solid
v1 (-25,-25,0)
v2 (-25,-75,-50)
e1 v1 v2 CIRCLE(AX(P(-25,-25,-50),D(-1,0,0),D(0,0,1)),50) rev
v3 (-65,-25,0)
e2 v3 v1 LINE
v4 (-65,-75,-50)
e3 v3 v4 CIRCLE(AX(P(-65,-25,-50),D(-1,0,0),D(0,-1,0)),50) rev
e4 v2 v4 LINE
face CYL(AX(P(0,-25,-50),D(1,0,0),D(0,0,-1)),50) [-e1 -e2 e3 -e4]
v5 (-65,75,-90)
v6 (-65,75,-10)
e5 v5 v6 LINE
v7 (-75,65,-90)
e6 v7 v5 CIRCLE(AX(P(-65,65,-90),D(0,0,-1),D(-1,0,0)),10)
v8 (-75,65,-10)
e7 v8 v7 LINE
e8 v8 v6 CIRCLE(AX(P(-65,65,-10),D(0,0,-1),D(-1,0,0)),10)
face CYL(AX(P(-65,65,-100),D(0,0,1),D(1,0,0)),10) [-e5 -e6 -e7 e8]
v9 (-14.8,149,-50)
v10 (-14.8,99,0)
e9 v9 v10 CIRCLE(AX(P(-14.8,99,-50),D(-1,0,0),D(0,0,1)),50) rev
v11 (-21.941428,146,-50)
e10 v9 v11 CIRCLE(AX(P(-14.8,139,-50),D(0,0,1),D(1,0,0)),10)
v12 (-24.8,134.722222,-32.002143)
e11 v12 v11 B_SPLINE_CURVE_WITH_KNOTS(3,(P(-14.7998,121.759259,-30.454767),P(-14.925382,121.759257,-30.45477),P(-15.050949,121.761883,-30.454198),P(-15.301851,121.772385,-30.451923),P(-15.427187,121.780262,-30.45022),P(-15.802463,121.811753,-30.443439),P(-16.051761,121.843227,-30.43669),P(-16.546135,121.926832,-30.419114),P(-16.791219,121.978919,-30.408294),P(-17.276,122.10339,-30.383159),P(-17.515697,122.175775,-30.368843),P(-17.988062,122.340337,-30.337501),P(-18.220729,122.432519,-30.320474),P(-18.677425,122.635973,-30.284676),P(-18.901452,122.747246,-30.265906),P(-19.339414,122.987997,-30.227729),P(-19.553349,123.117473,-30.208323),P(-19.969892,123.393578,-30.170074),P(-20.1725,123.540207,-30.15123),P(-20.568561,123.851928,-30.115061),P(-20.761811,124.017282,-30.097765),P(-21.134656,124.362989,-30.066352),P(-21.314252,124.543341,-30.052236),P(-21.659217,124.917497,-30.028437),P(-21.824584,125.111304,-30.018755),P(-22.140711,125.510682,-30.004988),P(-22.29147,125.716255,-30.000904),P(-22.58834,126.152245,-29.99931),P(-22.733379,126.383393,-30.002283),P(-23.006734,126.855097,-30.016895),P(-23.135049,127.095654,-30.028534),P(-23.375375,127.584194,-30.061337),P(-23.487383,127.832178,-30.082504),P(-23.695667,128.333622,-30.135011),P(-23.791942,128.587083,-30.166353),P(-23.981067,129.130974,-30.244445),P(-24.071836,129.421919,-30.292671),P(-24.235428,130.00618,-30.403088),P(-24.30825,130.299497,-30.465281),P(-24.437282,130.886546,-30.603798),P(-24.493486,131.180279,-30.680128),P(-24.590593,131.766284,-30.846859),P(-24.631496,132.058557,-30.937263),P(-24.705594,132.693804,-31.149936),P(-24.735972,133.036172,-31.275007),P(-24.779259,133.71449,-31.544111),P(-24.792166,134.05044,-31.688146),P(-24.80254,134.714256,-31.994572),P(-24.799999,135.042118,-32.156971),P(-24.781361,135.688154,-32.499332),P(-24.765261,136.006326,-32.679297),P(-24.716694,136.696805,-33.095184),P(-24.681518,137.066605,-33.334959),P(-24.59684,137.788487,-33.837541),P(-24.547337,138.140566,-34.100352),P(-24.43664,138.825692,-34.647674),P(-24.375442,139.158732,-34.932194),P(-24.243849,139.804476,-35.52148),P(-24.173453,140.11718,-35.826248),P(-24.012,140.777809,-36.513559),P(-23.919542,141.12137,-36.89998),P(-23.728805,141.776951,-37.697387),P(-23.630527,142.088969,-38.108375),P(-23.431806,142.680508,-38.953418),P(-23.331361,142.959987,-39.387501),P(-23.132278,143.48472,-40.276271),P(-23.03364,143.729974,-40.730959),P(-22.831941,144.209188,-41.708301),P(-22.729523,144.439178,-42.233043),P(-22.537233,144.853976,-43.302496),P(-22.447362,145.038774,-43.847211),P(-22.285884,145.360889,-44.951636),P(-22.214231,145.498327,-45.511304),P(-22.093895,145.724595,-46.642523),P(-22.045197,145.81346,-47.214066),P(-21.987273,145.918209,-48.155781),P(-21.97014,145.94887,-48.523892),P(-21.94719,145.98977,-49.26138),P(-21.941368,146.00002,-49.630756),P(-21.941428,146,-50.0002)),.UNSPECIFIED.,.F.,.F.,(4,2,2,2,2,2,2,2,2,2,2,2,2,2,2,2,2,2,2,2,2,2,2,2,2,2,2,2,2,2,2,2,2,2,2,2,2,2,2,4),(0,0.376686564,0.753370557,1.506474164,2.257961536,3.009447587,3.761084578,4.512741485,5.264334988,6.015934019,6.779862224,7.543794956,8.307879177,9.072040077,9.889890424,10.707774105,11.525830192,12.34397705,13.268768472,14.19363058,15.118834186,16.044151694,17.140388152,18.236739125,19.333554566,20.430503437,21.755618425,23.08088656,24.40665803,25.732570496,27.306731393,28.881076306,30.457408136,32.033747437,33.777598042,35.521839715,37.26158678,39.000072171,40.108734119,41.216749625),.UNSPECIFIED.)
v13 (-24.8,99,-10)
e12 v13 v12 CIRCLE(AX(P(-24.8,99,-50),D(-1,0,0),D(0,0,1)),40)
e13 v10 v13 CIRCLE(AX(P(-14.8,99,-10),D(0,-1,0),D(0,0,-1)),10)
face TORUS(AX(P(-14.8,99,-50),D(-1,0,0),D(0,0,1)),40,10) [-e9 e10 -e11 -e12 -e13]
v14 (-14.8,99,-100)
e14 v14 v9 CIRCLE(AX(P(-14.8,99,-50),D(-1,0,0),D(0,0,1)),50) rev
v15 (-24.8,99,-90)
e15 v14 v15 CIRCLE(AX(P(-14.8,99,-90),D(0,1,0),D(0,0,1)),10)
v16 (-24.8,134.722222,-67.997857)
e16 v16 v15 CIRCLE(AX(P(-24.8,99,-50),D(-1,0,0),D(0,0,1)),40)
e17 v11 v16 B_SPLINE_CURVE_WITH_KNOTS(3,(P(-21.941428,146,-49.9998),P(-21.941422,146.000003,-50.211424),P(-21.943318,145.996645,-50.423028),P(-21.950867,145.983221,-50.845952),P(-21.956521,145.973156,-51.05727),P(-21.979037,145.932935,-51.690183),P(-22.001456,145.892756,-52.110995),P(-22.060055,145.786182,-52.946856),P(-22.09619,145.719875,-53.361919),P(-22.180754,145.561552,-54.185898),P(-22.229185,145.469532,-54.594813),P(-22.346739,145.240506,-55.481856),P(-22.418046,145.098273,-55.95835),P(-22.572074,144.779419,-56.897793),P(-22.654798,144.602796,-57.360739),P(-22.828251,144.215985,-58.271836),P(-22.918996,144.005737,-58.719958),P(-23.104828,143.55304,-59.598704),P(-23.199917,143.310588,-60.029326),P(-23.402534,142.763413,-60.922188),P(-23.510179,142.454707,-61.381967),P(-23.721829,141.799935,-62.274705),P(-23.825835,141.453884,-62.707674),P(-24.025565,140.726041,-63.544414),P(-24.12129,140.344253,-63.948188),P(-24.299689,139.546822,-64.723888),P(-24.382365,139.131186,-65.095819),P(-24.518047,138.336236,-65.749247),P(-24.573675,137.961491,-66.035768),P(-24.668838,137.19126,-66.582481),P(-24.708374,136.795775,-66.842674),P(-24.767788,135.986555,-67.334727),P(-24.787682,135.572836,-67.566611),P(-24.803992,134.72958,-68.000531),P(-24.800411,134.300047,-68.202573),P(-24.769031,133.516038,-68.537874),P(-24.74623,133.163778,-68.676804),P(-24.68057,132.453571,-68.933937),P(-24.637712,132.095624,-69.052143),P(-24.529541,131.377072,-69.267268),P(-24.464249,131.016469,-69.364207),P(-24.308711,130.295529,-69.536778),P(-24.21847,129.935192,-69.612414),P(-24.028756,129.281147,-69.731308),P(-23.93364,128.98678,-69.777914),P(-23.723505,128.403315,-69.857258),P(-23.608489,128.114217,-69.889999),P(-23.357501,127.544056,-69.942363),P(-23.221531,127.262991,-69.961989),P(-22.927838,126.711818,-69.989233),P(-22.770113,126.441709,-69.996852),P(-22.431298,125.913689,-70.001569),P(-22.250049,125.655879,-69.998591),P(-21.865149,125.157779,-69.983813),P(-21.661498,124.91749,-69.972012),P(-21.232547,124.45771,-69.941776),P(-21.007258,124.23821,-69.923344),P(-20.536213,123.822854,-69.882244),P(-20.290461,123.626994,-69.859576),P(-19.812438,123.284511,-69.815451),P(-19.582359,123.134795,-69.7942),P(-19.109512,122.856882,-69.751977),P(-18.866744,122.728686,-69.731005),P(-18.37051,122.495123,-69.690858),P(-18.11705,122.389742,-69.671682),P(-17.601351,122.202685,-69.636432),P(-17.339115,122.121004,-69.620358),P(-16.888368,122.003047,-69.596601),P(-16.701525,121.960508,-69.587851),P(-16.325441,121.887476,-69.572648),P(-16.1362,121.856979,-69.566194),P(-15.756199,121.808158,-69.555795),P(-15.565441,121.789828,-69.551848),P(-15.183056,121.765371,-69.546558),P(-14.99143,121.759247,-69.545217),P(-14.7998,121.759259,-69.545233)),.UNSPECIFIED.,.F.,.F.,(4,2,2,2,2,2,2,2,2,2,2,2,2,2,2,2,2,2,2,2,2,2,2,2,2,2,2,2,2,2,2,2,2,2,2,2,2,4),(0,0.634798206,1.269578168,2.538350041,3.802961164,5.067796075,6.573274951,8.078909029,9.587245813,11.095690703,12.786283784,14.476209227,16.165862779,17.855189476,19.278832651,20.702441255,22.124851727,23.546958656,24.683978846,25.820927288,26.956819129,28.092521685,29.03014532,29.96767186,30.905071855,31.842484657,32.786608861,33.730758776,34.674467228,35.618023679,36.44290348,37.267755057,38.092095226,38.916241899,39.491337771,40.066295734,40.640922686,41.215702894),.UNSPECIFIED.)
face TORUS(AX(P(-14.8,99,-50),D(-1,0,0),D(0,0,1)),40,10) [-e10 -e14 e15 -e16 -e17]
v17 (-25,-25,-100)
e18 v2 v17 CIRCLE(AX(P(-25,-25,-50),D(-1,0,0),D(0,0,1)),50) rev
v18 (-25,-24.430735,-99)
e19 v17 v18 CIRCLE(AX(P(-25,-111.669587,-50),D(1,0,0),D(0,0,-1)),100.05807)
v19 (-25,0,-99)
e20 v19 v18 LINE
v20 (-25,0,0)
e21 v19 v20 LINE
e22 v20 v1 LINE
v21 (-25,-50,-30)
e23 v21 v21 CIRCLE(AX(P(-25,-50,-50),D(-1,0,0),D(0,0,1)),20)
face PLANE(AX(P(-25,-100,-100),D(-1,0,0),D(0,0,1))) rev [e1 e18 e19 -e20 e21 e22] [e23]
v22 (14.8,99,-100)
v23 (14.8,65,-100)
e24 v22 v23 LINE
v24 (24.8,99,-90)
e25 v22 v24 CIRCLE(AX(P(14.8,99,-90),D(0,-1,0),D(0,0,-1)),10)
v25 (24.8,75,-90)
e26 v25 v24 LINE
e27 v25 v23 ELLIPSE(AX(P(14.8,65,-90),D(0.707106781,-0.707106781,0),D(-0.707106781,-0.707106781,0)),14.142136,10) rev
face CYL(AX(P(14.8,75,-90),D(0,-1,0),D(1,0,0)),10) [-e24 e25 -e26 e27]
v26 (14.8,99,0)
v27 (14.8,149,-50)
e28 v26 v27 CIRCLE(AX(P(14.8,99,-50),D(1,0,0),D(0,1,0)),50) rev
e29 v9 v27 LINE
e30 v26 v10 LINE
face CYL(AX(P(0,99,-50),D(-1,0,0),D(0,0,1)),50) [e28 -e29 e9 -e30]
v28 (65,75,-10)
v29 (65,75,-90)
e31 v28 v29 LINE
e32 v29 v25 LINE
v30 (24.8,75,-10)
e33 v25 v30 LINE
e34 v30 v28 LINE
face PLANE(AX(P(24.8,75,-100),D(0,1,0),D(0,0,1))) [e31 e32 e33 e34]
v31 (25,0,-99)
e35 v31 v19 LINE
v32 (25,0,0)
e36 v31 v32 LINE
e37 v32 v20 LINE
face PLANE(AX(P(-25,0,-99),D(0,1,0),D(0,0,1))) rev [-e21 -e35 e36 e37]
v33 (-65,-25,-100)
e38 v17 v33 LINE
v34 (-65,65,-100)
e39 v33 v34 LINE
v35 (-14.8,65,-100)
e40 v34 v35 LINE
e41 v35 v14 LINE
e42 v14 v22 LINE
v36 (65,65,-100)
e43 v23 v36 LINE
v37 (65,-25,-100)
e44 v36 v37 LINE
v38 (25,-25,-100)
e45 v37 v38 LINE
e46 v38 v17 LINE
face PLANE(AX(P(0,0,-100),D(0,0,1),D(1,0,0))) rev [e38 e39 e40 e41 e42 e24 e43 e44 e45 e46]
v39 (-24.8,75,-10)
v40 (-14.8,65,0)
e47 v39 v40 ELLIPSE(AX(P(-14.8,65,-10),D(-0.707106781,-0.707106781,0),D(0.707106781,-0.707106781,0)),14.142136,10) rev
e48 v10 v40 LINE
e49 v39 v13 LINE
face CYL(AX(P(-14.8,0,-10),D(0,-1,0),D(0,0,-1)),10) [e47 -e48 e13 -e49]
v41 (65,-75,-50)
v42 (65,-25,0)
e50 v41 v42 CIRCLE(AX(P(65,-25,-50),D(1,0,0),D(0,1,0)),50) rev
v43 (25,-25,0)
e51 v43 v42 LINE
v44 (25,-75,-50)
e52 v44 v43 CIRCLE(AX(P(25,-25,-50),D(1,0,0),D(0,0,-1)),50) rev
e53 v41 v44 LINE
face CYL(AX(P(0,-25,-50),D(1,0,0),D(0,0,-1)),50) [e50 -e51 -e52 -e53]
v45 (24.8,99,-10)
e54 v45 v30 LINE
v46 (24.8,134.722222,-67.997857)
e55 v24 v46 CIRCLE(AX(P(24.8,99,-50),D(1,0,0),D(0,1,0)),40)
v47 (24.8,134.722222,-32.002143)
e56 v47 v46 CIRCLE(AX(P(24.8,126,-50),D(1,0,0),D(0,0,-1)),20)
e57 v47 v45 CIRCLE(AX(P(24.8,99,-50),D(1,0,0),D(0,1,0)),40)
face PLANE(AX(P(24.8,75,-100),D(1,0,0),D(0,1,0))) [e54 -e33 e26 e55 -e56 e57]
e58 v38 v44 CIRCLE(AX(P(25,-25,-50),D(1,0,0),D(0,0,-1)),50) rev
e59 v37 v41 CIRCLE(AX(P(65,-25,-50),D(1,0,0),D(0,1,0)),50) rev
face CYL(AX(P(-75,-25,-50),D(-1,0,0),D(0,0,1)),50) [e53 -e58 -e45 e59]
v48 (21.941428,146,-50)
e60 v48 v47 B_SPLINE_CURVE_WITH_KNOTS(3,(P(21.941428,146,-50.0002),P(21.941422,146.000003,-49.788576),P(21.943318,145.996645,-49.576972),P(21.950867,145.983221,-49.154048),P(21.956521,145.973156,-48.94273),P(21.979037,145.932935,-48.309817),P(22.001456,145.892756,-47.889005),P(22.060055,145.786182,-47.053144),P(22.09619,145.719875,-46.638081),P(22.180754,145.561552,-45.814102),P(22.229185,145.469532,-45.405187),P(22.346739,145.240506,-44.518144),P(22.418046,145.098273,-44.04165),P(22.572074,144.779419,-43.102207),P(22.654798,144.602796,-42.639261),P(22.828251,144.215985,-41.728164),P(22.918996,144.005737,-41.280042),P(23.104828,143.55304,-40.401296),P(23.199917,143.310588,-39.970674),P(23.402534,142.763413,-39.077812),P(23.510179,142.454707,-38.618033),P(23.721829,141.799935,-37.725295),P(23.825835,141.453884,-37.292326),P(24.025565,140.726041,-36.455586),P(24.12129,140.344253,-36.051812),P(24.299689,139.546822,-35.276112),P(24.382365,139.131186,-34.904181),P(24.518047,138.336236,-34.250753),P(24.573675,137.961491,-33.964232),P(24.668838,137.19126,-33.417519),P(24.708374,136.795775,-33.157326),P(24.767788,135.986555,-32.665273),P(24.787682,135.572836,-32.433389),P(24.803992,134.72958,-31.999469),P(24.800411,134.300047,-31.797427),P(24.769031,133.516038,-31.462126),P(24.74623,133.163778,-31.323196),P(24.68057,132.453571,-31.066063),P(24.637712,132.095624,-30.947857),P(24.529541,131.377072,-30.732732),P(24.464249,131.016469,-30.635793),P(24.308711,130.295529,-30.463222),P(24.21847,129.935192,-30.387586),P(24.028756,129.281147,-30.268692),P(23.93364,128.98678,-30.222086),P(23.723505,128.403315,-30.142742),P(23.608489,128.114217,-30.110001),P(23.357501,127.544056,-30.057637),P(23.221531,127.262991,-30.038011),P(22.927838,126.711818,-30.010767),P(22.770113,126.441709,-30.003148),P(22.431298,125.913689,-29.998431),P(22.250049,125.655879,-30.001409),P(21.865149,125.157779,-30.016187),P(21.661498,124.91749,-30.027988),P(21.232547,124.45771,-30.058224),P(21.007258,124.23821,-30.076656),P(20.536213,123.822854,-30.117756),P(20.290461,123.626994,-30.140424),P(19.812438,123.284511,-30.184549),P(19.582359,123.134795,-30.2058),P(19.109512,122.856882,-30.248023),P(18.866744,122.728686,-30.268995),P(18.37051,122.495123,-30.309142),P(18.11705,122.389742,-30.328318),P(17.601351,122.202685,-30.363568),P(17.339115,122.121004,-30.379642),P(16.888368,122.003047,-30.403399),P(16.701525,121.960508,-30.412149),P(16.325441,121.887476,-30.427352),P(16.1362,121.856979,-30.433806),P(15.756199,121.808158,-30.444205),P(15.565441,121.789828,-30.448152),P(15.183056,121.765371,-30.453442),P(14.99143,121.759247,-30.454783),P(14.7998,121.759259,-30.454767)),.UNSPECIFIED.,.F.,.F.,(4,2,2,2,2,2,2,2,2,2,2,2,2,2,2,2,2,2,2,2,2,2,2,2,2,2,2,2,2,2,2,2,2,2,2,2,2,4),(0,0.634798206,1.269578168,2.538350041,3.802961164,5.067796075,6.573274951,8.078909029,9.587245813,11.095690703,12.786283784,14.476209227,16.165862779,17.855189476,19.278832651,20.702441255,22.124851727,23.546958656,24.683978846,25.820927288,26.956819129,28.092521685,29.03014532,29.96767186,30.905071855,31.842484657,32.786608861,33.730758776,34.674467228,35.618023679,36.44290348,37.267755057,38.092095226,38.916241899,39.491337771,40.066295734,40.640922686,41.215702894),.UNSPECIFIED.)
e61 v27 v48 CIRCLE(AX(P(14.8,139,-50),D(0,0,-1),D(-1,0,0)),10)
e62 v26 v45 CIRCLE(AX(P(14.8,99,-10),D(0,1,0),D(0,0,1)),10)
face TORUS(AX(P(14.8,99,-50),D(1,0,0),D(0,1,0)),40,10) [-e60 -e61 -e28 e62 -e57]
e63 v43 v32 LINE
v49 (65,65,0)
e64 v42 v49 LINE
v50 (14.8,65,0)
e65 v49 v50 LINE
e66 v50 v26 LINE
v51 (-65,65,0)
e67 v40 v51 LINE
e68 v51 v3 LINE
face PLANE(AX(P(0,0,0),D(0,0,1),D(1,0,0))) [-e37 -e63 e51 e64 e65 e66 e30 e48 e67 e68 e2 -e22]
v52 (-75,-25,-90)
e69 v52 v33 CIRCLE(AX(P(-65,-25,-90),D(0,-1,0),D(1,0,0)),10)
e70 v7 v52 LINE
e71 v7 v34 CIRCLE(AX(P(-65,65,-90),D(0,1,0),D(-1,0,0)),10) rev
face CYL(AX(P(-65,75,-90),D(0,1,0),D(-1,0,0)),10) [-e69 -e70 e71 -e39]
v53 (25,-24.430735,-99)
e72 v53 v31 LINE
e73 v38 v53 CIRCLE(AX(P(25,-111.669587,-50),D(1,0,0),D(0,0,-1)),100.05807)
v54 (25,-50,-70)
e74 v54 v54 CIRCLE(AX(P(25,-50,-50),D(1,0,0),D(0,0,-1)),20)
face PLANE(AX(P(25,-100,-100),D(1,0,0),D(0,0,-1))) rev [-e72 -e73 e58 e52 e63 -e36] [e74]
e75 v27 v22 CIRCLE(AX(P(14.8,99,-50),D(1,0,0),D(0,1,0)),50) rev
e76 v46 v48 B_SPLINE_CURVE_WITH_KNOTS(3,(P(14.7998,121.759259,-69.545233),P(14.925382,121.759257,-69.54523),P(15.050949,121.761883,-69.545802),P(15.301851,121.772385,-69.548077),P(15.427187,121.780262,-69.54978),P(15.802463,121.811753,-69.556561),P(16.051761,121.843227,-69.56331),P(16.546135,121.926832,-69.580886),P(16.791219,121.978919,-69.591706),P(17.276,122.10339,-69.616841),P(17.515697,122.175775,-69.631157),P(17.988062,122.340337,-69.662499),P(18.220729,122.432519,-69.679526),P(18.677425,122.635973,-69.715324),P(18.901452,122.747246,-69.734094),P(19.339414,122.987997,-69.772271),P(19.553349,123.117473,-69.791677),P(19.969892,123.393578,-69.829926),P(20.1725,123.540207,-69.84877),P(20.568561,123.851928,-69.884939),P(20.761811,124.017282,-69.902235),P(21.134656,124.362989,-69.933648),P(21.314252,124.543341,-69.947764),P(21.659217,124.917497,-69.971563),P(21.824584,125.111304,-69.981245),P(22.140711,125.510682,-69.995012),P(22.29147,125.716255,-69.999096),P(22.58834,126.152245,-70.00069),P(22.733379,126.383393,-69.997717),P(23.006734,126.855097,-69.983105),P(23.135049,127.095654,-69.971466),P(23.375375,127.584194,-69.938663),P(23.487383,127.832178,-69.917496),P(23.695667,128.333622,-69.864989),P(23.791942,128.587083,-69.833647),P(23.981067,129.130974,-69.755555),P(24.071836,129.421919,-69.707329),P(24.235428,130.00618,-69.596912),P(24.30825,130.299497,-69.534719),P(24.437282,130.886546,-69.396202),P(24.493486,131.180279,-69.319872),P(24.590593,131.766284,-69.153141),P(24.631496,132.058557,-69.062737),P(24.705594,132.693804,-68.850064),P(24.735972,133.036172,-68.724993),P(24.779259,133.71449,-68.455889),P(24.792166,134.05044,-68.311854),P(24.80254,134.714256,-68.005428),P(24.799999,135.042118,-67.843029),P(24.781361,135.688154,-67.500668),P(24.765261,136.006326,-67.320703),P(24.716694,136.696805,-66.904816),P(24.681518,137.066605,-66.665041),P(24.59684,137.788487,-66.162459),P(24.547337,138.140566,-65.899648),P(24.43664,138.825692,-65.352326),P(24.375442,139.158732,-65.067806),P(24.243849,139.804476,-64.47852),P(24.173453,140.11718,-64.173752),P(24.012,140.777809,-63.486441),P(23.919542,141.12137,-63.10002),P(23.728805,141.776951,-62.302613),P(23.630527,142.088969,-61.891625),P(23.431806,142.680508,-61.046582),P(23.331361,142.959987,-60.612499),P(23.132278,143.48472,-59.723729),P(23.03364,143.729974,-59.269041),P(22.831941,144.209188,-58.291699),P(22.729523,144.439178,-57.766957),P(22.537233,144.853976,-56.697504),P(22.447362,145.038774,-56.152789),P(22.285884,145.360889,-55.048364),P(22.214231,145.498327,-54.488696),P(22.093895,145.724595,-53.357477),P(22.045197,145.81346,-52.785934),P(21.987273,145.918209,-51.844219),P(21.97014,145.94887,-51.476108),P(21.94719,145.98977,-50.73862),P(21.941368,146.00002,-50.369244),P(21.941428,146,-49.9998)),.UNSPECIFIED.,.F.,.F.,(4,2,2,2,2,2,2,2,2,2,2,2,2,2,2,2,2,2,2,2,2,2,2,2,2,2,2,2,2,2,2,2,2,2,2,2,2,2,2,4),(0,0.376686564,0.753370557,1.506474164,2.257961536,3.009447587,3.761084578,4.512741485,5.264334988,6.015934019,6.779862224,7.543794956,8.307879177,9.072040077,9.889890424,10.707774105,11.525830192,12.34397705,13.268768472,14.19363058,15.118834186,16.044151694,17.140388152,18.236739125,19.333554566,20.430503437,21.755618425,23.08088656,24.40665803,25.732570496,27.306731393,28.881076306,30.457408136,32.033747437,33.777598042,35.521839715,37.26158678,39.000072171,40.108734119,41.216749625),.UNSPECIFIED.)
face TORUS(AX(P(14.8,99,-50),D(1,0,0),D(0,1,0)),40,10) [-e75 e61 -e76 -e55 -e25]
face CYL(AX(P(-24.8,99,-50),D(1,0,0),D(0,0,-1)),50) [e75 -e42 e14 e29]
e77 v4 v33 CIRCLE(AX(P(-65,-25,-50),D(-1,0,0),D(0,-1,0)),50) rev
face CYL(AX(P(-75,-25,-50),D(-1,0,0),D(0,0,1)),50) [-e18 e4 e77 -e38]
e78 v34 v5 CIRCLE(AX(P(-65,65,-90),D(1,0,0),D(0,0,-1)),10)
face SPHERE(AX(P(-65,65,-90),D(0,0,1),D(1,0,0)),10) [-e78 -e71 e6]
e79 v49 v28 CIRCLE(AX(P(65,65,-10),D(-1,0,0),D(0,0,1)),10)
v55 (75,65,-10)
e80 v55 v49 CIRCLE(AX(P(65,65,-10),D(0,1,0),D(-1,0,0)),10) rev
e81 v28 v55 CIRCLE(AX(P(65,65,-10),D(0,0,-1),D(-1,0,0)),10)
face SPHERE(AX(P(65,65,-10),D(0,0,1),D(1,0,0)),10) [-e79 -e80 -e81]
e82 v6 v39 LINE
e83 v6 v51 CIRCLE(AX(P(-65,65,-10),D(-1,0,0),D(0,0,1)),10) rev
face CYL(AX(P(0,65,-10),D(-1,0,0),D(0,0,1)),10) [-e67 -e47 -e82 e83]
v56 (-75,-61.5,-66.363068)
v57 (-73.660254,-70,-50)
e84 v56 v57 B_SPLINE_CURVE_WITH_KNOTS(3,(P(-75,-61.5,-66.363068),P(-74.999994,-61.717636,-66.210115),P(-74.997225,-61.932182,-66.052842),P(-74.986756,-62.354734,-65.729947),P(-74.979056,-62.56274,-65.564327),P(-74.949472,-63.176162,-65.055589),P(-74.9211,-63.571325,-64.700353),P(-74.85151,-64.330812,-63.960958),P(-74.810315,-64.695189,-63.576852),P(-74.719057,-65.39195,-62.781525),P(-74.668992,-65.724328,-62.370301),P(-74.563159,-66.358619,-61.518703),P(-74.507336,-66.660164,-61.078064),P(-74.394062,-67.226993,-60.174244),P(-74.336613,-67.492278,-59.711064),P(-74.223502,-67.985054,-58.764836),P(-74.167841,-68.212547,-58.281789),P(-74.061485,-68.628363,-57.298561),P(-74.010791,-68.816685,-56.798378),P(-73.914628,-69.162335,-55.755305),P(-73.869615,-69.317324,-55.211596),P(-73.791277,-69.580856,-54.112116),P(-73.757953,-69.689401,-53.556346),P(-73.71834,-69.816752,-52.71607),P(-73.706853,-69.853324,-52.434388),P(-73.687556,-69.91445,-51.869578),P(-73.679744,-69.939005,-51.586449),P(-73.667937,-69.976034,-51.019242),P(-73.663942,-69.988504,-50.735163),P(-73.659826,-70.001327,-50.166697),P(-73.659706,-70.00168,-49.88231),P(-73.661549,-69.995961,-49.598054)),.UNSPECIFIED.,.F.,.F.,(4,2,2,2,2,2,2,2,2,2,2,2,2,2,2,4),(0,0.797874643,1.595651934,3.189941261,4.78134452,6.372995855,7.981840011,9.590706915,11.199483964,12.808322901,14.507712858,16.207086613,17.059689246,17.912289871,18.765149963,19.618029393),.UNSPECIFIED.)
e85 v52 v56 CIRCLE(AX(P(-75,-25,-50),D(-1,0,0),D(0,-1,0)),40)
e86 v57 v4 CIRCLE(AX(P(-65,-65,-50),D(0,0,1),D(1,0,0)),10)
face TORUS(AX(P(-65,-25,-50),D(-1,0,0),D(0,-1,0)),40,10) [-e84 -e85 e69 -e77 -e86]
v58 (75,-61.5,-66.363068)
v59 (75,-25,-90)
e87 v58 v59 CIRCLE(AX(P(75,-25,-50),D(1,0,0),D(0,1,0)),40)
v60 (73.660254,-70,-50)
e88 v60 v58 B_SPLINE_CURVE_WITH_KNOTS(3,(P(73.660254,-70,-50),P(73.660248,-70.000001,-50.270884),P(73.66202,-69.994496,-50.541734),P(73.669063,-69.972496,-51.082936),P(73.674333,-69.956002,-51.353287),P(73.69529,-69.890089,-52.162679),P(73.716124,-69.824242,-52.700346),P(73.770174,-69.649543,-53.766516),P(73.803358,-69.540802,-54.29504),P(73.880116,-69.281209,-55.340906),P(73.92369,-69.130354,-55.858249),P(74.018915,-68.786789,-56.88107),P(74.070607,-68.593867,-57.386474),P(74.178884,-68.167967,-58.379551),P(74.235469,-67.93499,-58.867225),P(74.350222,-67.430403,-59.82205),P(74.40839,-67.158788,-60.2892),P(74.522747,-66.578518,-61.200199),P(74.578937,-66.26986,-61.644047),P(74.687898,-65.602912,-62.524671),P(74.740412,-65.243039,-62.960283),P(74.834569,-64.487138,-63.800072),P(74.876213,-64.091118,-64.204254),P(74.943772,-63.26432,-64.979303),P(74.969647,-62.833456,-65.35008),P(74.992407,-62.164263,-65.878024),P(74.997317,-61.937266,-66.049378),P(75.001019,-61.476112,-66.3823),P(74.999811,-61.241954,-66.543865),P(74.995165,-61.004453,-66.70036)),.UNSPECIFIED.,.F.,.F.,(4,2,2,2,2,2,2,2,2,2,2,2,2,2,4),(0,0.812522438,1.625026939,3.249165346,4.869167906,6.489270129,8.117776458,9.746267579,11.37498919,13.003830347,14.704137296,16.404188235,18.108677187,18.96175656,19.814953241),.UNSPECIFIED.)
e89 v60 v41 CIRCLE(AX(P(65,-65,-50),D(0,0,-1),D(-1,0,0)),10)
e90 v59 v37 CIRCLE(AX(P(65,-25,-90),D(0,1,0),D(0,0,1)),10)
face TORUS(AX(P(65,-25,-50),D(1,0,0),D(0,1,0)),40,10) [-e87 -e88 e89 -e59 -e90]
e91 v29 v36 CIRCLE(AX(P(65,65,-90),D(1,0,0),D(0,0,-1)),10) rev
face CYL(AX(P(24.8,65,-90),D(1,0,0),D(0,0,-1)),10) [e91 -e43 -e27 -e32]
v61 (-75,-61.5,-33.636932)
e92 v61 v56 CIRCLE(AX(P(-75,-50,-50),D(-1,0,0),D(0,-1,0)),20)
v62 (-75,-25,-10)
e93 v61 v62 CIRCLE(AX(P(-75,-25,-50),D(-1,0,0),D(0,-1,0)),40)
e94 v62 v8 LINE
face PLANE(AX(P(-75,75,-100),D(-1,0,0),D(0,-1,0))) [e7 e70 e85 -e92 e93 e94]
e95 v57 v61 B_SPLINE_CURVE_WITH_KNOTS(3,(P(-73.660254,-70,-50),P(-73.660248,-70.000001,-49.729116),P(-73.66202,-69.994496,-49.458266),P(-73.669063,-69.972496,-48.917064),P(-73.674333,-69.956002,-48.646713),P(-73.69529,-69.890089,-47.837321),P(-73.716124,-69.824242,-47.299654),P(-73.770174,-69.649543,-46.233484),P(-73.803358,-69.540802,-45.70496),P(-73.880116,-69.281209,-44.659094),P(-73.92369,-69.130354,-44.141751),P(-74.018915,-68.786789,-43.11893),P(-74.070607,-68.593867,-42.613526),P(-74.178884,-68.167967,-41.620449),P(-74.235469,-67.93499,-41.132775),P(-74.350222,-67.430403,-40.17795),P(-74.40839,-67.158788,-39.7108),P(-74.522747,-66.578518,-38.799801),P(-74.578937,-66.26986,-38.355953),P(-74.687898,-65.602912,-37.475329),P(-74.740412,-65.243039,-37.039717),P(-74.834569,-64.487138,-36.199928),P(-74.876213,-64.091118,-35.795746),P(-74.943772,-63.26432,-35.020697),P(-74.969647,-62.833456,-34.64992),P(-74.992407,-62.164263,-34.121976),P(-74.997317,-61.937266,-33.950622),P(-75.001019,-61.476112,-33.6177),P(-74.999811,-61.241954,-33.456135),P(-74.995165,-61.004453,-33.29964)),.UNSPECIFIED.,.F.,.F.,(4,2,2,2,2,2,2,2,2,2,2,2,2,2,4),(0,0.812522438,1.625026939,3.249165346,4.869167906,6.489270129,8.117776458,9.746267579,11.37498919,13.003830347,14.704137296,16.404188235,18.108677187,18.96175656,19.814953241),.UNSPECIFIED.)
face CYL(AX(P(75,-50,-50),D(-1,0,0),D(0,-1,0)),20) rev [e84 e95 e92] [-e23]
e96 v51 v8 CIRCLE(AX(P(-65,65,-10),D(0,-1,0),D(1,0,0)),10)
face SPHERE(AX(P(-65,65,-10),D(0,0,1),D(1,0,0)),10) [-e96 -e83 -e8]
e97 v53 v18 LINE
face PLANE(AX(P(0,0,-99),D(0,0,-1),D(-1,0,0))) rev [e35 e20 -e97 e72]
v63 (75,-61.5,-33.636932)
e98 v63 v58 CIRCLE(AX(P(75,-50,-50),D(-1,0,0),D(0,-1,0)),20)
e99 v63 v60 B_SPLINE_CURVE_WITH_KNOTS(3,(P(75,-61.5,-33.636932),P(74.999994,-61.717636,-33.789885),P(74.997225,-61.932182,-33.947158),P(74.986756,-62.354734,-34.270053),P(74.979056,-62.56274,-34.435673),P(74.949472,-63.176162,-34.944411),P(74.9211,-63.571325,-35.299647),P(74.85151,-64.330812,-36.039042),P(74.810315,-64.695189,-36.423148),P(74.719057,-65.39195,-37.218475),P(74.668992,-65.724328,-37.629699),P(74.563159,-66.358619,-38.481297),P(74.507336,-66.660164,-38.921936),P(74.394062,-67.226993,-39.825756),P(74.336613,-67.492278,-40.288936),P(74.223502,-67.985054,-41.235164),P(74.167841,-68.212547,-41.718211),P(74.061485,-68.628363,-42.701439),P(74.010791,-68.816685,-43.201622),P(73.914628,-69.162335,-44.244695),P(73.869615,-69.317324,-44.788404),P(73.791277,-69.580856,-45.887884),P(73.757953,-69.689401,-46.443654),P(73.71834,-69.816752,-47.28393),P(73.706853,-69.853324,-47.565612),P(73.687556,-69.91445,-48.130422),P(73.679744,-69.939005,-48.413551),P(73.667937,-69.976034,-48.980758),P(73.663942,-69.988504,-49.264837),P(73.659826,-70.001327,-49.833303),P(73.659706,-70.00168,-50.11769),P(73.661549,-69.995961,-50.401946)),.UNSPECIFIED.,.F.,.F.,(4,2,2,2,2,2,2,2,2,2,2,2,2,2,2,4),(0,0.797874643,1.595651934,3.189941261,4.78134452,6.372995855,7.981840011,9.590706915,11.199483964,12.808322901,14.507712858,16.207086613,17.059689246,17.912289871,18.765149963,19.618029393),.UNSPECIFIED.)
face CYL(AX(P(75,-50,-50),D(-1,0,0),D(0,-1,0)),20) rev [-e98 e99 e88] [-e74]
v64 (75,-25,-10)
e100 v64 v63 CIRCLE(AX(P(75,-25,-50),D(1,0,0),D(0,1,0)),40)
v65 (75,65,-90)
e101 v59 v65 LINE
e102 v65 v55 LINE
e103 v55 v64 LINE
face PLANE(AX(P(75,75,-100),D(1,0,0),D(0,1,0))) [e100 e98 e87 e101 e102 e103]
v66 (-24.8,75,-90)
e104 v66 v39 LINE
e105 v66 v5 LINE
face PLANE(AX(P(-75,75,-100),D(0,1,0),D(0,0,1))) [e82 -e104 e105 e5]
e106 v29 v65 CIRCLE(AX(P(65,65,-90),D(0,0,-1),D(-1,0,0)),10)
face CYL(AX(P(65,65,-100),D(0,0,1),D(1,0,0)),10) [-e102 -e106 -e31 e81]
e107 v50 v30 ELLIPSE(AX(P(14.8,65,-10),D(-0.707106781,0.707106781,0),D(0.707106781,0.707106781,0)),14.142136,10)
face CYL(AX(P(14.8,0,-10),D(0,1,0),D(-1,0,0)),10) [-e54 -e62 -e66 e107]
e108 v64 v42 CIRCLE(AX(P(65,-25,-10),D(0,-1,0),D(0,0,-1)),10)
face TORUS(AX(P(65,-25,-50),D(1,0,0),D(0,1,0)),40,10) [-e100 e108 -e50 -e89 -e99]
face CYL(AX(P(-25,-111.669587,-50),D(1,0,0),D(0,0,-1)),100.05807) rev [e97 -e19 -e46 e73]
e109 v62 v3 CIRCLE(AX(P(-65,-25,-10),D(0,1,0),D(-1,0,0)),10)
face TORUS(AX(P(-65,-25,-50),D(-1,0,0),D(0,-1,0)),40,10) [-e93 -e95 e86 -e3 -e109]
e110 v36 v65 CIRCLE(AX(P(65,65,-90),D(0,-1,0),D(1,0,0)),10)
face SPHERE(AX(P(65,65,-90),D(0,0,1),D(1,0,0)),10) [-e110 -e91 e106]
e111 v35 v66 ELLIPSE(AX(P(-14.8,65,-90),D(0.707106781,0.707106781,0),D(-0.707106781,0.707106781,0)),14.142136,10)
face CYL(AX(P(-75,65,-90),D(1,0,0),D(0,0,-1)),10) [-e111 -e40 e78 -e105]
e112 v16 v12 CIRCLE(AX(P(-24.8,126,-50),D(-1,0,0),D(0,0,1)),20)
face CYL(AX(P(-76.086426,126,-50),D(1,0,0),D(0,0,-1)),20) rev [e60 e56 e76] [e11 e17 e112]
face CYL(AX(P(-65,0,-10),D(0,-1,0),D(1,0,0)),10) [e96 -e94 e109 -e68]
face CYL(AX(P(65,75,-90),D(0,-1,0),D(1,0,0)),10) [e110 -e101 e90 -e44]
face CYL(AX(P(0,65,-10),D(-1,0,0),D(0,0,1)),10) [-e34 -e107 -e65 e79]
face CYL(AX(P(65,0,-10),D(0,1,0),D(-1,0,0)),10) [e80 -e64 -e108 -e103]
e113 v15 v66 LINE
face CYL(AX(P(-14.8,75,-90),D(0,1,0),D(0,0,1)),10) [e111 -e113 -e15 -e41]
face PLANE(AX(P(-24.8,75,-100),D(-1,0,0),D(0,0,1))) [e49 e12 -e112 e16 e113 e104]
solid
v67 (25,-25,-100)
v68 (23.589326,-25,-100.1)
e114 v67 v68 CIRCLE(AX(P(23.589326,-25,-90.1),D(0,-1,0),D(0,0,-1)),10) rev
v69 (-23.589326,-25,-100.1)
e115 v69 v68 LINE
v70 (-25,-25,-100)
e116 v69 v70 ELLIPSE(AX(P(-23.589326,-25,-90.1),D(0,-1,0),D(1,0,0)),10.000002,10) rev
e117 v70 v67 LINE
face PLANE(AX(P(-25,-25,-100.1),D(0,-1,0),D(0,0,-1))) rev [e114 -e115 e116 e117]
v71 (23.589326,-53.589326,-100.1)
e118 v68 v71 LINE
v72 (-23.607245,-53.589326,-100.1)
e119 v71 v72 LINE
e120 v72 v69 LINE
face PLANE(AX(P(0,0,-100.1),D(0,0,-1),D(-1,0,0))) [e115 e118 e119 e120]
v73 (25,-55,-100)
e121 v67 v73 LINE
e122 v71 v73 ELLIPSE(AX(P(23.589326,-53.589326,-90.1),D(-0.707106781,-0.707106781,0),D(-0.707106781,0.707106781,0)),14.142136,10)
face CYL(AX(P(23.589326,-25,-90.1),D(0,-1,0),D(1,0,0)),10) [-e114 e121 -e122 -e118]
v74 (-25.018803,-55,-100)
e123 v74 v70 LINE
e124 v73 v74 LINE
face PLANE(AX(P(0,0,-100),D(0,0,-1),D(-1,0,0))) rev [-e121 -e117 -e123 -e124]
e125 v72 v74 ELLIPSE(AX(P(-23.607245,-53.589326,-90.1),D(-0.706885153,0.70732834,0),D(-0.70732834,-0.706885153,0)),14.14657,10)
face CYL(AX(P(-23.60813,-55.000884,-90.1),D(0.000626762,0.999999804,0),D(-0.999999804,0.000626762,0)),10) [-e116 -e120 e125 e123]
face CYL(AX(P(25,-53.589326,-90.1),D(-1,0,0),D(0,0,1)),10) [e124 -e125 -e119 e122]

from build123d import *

# Parameters (mm, degrees)
BOSS_EXTRUDE1_DEPTH    = 100
SKETCH2_W              = 50
SKETCH2_H              = 50
CUT_EXTRUDE1_DEPTH     = 195.489074243
FILLET1_R              = 50
CUT_EXTRUDE2_DEPTH     = 25
SKETCH7_R              = 20
CUT_EXTRUDE3_DEPTH     = 234.882449106
FILLET2_R              = 50
CUT_EXTRUDE6_START     = -75
CUT_EXTRUDE6_OUTLINE_W = 50
CUT_EXTRUDE6_OUTLINE_H = 6.698729811
CUT_EXTRUDE6_DEPTH     = 50
CUT_EXTRUDE7_DEPTH     = 25
FILLET3_R              = 10
SKETCH11_W             = 50
SKETCH11_H             = 25
CUT_EXTRUDE8_DEPTH     = 99
BOSS_EXTRUDE7_DEPTH    = 0.1
FILLET4_R              = 10
FILLET5_R              = 10
SKETCH14_R             = 20
CUT_EXTRUDE9_DEPTH     = 206.380257205


with BuildPart() as part:
    # Sketch1 → Boss-Extrude1 (new body)
    with BuildSketch(Plane.XY):
        Polygon((-24.8, 75), (-24.8, 149), (24.8, 149), (24.8, 75), (75, 75), (75, -75), (-75, -75), (-75, 75), align=None)
    extrude(amount=-BOSS_EXTRUDE1_DEPTH)

    # Sketch2 → Cut-Extrude1 (cut, through all)
    with BuildSketch(Plane.XY):
        with Locations((0, -75)):
            Rectangle(SKETCH2_W, SKETCH2_H)
    extrude(amount=-CUT_EXTRUDE1_DEPTH, mode=Mode.SUBTRACT)

    # Fillet1
    fillet1_edges = [part.edges().sort_by_distance(p)[0] for p in [
        (0, 149, -100),
        (0, 149, 0),
    ]]
    fillet(fillet1_edges, radius=FILLET1_R - 0.0001)  # a hair under: the kernel refuses the full size

    # Sketch6 → Cut-Extrude2 (cut, symmetric)
    with BuildSketch(Plane(origin=(0, 0, 0), x_dir=(0, 0, -1), z_dir=(1, 0, 0))):
        with BuildLine():
            Line((100, -50), (0, -50))
            ThreePointArc((0, -50), (50, 0), (100, -50))
        make_face()
    extrude(amount=CUT_EXTRUDE2_DEPTH, both=True, mode=Mode.SUBTRACT)

    # Sketch7 → Cut-Extrude3 (cut, through all)
    with BuildSketch(Plane.ZY.offset(75)):
        with Locations(Location((-50, -50, 0), (0, 0, 270))):
            Circle(SKETCH7_R)
    extrude(amount=-CUT_EXTRUDE3_DEPTH, mode=Mode.SUBTRACT)

    # Fillet2
    fillet2_edges = [part.edges().sort_by_distance(p)[0] for p in [
        (-50, -75, -100),
        (-50, -75, 0),
    ]]
    fillet(fillet2_edges, radius=FILLET2_R - 0.0001)  # a hair under: the kernel refuses the full size

    # Cut-Extrude6: read off the stored shape, not the designer's step
    # Cut-Extrude6 outline → Cut-Extrude6 (cut)
    with BuildSketch(Plane(origin=(0, 0, 0), x_dir=(1, 0, 0), z_dir=(0, 1, 0)).offset(CUT_EXTRUDE6_START)):
        with Locations((0, 96.650635095)):
            Rectangle(CUT_EXTRUDE6_OUTLINE_W, CUT_EXTRUDE6_OUTLINE_H)
        with Locations((0, 3.349364906)):
            Rectangle(CUT_EXTRUDE6_OUTLINE_W, CUT_EXTRUDE6_OUTLINE_H)
    extrude(amount=CUT_EXTRUDE6_DEPTH, mode=Mode.SUBTRACT)

    # Sketch10 → Cut-Extrude7 (cut, symmetric)
    with BuildSketch(Plane(origin=(0, 0, 0), x_dir=(0, 0, -1), z_dir=(1, 0, 0))):
        with BuildLine():
            Line((0, -25), (100, -25))
            ThreePointArc((100, -25), (50, -11.611517322), (0, -25))
        make_face()
    extrude(amount=CUT_EXTRUDE7_DEPTH, both=True, mode=Mode.SUBTRACT)

    # Fillet3
    # the kernel refuses this fillet: 10 mm, written as the material it takes off along each edge
    with BuildSketch(Plane(origin=(24.8, 99.0001, -100), x_dir=(0, 0, 1), z_dir=(0, -1, 0)), Plane(origin=(-24.8, 75, 0), x_dir=(1, 0, 0), z_dir=(0, 1, 0)), Plane(origin=(-24.8, 75, -100), x_dir=(0, 0, 1), z_dir=(0, 1, 0)), Plane(origin=(24.8, 99.0001, 0), x_dir=(-1, 0, 0), z_dir=(0, -1, 0))) as fillet3_piece_1:
        with BuildLine():
            CenterArc((FILLET3_R, FILLET3_R), FILLET3_R, 180, 90)
            Line((0, FILLET3_R), (0, 0))
            Line((0, 0), (FILLET3_R, 0))
        make_face()
    extrude(amount=24.0001, mode=Mode.SUBTRACT)
    with BuildSketch(Plane(origin=(24.8, 75, 0), x_dir=(0, -1, 0), z_dir=(1, 0, 0)), Plane(origin=(-100, 75, -100), x_dir=(0, 0, 1), z_dir=(1, 0, 0)), Plane(origin=(24.8, 75, -100), x_dir=(0, 0, 1), z_dir=(1, 0, 0)), Plane(origin=(-100, 75, 0), x_dir=(0, -1, 0), z_dir=(1, 0, 0))) as fillet3_piece_2:
        with BuildLine():
            CenterArc((FILLET3_R, FILLET3_R), FILLET3_R, 180, 90)
            Line((0, FILLET3_R), (0, 0))
            Line((0, 0), (FILLET3_R, 0))
        make_face()
    extrude(amount=75.2, mode=Mode.SUBTRACT)
    with BuildSketch(Plane(origin=(-75, -25.0001, -100), x_dir=(0, 0, 1), z_dir=(0, 1, 0)), Plane(origin=(75, 100, 0), x_dir=(-1, 0, 0), z_dir=(0, -1, 0)), Plane(origin=(75, 100, -100), x_dir=(0, 0, 1), z_dir=(0, -1, 0)), Plane(origin=(-75, -25.0001, 0), x_dir=(1, 0, 0), z_dir=(0, 1, 0))) as fillet3_piece_3:
        with BuildLine():
            CenterArc((FILLET3_R, FILLET3_R), FILLET3_R, 180, 90)
            Line((0, FILLET3_R), (0, 0))
            Line((0, 0), (FILLET3_R, 0))
        make_face()
    extrude(amount=125.0001, mode=Mode.SUBTRACT)
    with BuildSketch(Plane(origin=(-24.8, 99.0001, -49.9999), x_dir=(0, 1, 0), z_dir=(0, 0, -1))) as fillet3_piece_4:
        with BuildLine():
            CenterArc((49.9999 - FILLET3_R, FILLET3_R), FILLET3_R, 270, 90)
            Line((49.9999 - FILLET3_R, 0), (49.9999, 0))
            Line((49.9999, 0), (49.9999, FILLET3_R))
        make_face()
    revolve(axis=Axis((-24.8, 99.0001, -49.9999), (1, 0, 0)), revolution_arc=90, mode=Mode.SUBTRACT)
    with BuildSketch(Plane(origin=(-24.8, 99.0001, -50.0001), x_dir=(0, 1, 0), z_dir=(0, 0, 1))) as fillet3_piece_5:
        with BuildLine():
            CenterArc((49.9999 - FILLET3_R, -FILLET3_R), FILLET3_R, 0, 90)
            Line((49.9999, -FILLET3_R), (49.9999, 0))
            Line((49.9999, 0), (49.9999 - FILLET3_R, 0))
        make_face()
    revolve(axis=Axis((-24.8, 99.0001, -50.0001), (-1, 0, 0)), revolution_arc=90, mode=Mode.SUBTRACT)
    with BuildSketch(Plane(origin=(24.8, 99.0001, -49.9999), x_dir=(0, 1, 0), z_dir=(0, 0, -1))) as fillet3_piece_6:
        with BuildLine():
            CenterArc((49.9999 - FILLET3_R, -FILLET3_R), FILLET3_R, 0, 90)
            Line((49.9999, -FILLET3_R), (49.9999, 0))
            Line((49.9999, 0), (49.9999 - FILLET3_R, 0))
        make_face()
    revolve(axis=Axis((24.8, 99.0001, -49.9999), (1, 0, 0)), revolution_arc=90, mode=Mode.SUBTRACT)
    with BuildSketch(Plane(origin=(24.8, 99.0001, -50.0001), x_dir=(0, 1, 0), z_dir=(0, 0, 1))) as fillet3_piece_7:
        with BuildLine():
            CenterArc((49.9999 - FILLET3_R, FILLET3_R), FILLET3_R, 270, 90)
            Line((49.9999, FILLET3_R), (49.9999, 0))
            Line((49.9999, 0), (49.9999 - FILLET3_R, 0))
        make_face()
    revolve(axis=Axis((24.8, 99.0001, -50.0001), (-1, 0, 0)), revolution_arc=90, mode=Mode.SUBTRACT)
    with BuildSketch(Plane(origin=(75, -25.0001, -49.9999), x_dir=(0, 0, 1), z_dir=(0, 1, 0))) as fillet3_piece_8:
        with BuildLine():
            CenterArc((49.9999 - FILLET3_R, -FILLET3_R), FILLET3_R, 0, 90)
            Line((49.9999, -FILLET3_R), (49.9999, 0))
            Line((49.9999, 0), (49.9999 - FILLET3_R, 0))
        make_face()
    revolve(axis=Axis((75, -25.0001, -49.9999), (1, 0, 0)), revolution_arc=90, mode=Mode.SUBTRACT)
    with BuildSketch(Plane(origin=(75, -25.0001, -50.0001), x_dir=(0, 0, -1), z_dir=(0, 1, 0))) as fillet3_piece_9:
        with BuildLine():
            CenterArc((49.9999 - FILLET3_R, FILLET3_R), FILLET3_R, 270, 90)
            Line((49.9999, FILLET3_R), (49.9999, 0))
            Line((49.9999, 0), (49.9999 - FILLET3_R, 0))
        make_face()
    revolve(axis=Axis((75, -25.0001, -50.0001), (-1, 0, 0)), revolution_arc=90, mode=Mode.SUBTRACT)
    with BuildSketch(Plane(origin=(-75, -25.0001, -49.9999), x_dir=(0, 0, 1), z_dir=(0, 1, 0))) as fillet3_piece_10:
        with BuildLine():
            CenterArc((49.9999 - FILLET3_R, FILLET3_R), FILLET3_R, 270, 90)
            Line((49.9999, FILLET3_R), (49.9999, 0))
            Line((49.9999, 0), (49.9999 - FILLET3_R, 0))
        make_face()
    revolve(axis=Axis((-75, -25.0001, -49.9999), (1, 0, 0)), revolution_arc=90, mode=Mode.SUBTRACT)
    with BuildSketch(Plane(origin=(-75, -25.0001, -50.0001), x_dir=(0, 0, -1), z_dir=(0, 1, 0))) as fillet3_piece_11:
        with BuildLine():
            CenterArc((49.9999 - FILLET3_R, -FILLET3_R), FILLET3_R, 0, 90)
            Line((49.9999, -FILLET3_R), (49.9999, 0))
            Line((49.9999, 0), (49.9999 - FILLET3_R, 0))
        make_face()
    revolve(axis=Axis((-75, -25.0001, -50.0001), (-1, 0, 0)), revolution_arc=90, mode=Mode.SUBTRACT)
    with BuildSketch(Plane(origin=(-75, -75, -49.9999), x_dir=(0, 1, 0), z_dir=(0, 0, -1)), Plane(origin=(24.8, 149, -49.9999), x_dir=(0, -1, 0), z_dir=(0, 0, -1))) as fillet3_piece_12:
        with BuildLine():
            CenterArc((FILLET3_R, FILLET3_R), FILLET3_R, 180, 90)
            Line((0, FILLET3_R), (0, 0))
            Line((0, 0), (FILLET3_R, 0))
        make_face()
    extrude(amount=0.0002, mode=Mode.SUBTRACT)
    with BuildSketch(Plane(origin=(75, -75, -49.9999), x_dir=(0, 1, 0), z_dir=(0, 0, -1)), Plane(origin=(-24.8, 149, -49.9999), x_dir=(0, -1, 0), z_dir=(0, 0, -1))) as fillet3_piece_13:
        with BuildLine():
            CenterArc((FILLET3_R, -FILLET3_R), FILLET3_R, 90, 90)
            Line((0, -FILLET3_R), (0, 0))
            Line((0, 0), (FILLET3_R, 0))
        make_face()
    extrude(amount=0.0002, mode=Mode.SUBTRACT)
    with BuildSketch(Plane(origin=(-0.2, 75, -100), x_dir=(0, 0, 1), z_dir=(1, 0, 0))) as fillet3_piece_14a_section:
        with BuildLine():
            CenterArc((FILLET3_R, FILLET3_R), FILLET3_R, 180, 90)
            Line((0, FILLET3_R), (0, 0))
            Line((0, 0), (FILLET3_R, 0))
        make_face()
    fillet3_piece_14a = extrude(amount=100.2, mode=Mode.PRIVATE)
    fillet3_piece_14a = split(fillet3_piece_14a, bisect_by=Plane(origin=(24.8, 75, -100), z_dir=(-1, 0, 0)), keep=Keep.TOP, mode=Mode.PRIVATE)
    with BuildSketch(Plane(origin=(24.8, 99.0001, -100), x_dir=(0, 0, 1), z_dir=(0, -1, 0))) as fillet3_piece_14b_section:
        with BuildLine():
            CenterArc((FILLET3_R, FILLET3_R), FILLET3_R, 180, 90)
            Line((0, FILLET3_R), (0, 0))
            Line((0, 0), (FILLET3_R, 0))
        make_face()
    fillet3_piece_14b = extrude(amount=49.0001, mode=Mode.PRIVATE)
    fillet3_piece_14b = split(fillet3_piece_14b, bisect_by=Plane(origin=(24.8, 75, -100), z_dir=(0, -1, 0)), keep=Keep.TOP, mode=Mode.PRIVATE)
    fillet3_piece_14 = fillet3_piece_14a & fillet3_piece_14b
    add(fillet3_piece_14, mode=Mode.SUBTRACT)
    with BuildSketch(Plane(origin=(-0.2, 75, 0), x_dir=(0, -1, 0), z_dir=(1, 0, 0))) as fillet3_piece_15a_section:
        with BuildLine():
            CenterArc((FILLET3_R, FILLET3_R), FILLET3_R, 180, 90)
            Line((0, FILLET3_R), (0, 0))
            Line((0, 0), (FILLET3_R, 0))
        make_face()
    fillet3_piece_15a = extrude(amount=100.2, mode=Mode.PRIVATE)
    fillet3_piece_15a = split(fillet3_piece_15a, bisect_by=Plane(origin=(24.8, 75, 0), z_dir=(-1, 0, 0)), keep=Keep.TOP, mode=Mode.PRIVATE)
    with BuildSketch(Plane(origin=(24.8, 99.0001, 0), x_dir=(-1, 0, 0), z_dir=(0, -1, 0))) as fillet3_piece_15b_section:
        with BuildLine():
            CenterArc((FILLET3_R, FILLET3_R), FILLET3_R, 180, 90)
            Line((0, FILLET3_R), (0, 0))
            Line((0, 0), (FILLET3_R, 0))
        make_face()
    fillet3_piece_15b = extrude(amount=49.0001, mode=Mode.PRIVATE)
    fillet3_piece_15b = split(fillet3_piece_15b, bisect_by=Plane(origin=(24.8, 75, 0), z_dir=(0, -1, 0)), keep=Keep.TOP, mode=Mode.PRIVATE)
    fillet3_piece_15 = fillet3_piece_15a & fillet3_piece_15b
    add(fillet3_piece_15, mode=Mode.SUBTRACT)
    with BuildSketch(Plane(origin=(-24.8, 50, -100), x_dir=(0, 0, 1), z_dir=(0, 1, 0))) as fillet3_piece_16a_section:
        with BuildLine():
            CenterArc((FILLET3_R, FILLET3_R), FILLET3_R, 180, 90)
            Line((0, FILLET3_R), (0, 0))
            Line((0, 0), (FILLET3_R, 0))
        make_face()
    fillet3_piece_16a = extrude(amount=49.0001, mode=Mode.PRIVATE)
    fillet3_piece_16a = split(fillet3_piece_16a, bisect_by=Plane(origin=(-24.8, 75, -100), z_dir=(0, -1, 0)), keep=Keep.TOP, mode=Mode.PRIVATE)
    with BuildSketch(Plane(origin=(-100, 75, -100), x_dir=(0, 0, 1), z_dir=(1, 0, 0))) as fillet3_piece_16b_section:
        with BuildLine():
            CenterArc((FILLET3_R, FILLET3_R), FILLET3_R, 180, 90)
            Line((0, FILLET3_R), (0, 0))
            Line((0, 0), (FILLET3_R, 0))
        make_face()
    fillet3_piece_16b = extrude(amount=100.2, mode=Mode.PRIVATE)
    fillet3_piece_16b = split(fillet3_piece_16b, bisect_by=Plane(origin=(-24.8, 75, -100), z_dir=(1, 0, 0)), keep=Keep.TOP, mode=Mode.PRIVATE)
    fillet3_piece_16 = fillet3_piece_16a & fillet3_piece_16b
    add(fillet3_piece_16, mode=Mode.SUBTRACT)
    with BuildSketch(Plane(origin=(-24.8, 50, 0), x_dir=(1, 0, 0), z_dir=(0, 1, 0))) as fillet3_piece_17a_section:
        with BuildLine():
            CenterArc((FILLET3_R, FILLET3_R), FILLET3_R, 180, 90)
            Line((0, FILLET3_R), (0, 0))
            Line((0, 0), (FILLET3_R, 0))
        make_face()
    fillet3_piece_17a = extrude(amount=49.0001, mode=Mode.PRIVATE)
    fillet3_piece_17a = split(fillet3_piece_17a, bisect_by=Plane(origin=(-24.8, 75, 0), z_dir=(0, -1, 0)), keep=Keep.TOP, mode=Mode.PRIVATE)
    with BuildSketch(Plane(origin=(-100, 75, 0), x_dir=(0, -1, 0), z_dir=(1, 0, 0))) as fillet3_piece_17b_section:
        with BuildLine():
            CenterArc((FILLET3_R, FILLET3_R), FILLET3_R, 180, 90)
            Line((0, FILLET3_R), (0, 0))
            Line((0, 0), (FILLET3_R, 0))
        make_face()
    fillet3_piece_17b = extrude(amount=100.2, mode=Mode.PRIVATE)
    fillet3_piece_17b = split(fillet3_piece_17b, bisect_by=Plane(origin=(-24.8, 75, 0), z_dir=(1, 0, 0)), keep=Keep.TOP, mode=Mode.PRIVATE)
    fillet3_piece_17 = fillet3_piece_17a & fillet3_piece_17b
    add(fillet3_piece_17, mode=Mode.SUBTRACT)

    # Sketch11 → Cut-Extrude8 (cut)
    with BuildSketch(Plane.XY):
        with Locations((0, -12.5)):
            Rectangle(SKETCH11_W, SKETCH11_H)
    extrude(amount=-CUT_EXTRUDE8_DEPTH, mode=Mode.SUBTRACT)

    # Fillet5
    # the kernel refuses this fillet: 10 mm, written as the material it takes off along each edge
    with BuildSketch(Plane(origin=(65, 65, -10), x_dir=(0, 1, 0), z_dir=(1, 0, 0))) as fillet5_piece_1_section:
        Polygon((0, 0), (FILLET5_R, 0), (FILLET5_R, FILLET5_R), (0, FILLET5_R), align=None)
    fillet5_piece_1 = extrude(amount=FILLET5_R, mode=Mode.PRIVATE)
    fillet5_piece_1 = fillet5_piece_1 - Plane(origin=(65, 65, -10), x_dir=(0, -0.7071067811865475, -0.7071067811865475), z_dir=(1, 0, 0)) * Sphere(FILLET5_R, mode=Mode.PRIVATE)
    add(fillet5_piece_1, mode=Mode.SUBTRACT)
    with BuildSketch(Plane(origin=(65, 65, -90), x_dir=(0, 1, 0), z_dir=(1, 0, 0))) as fillet5_piece_2_section:
        Polygon((0, 0), (FILLET5_R, 0), (FILLET5_R, -FILLET5_R), (0, -FILLET5_R), align=None)
    fillet5_piece_2 = extrude(amount=FILLET5_R, mode=Mode.PRIVATE)
    fillet5_piece_2 = fillet5_piece_2 - Plane(origin=(65, 65, -90), x_dir=(0, -0.7071067811865475, 0.7071067811865475), z_dir=(1, 0, 0)) * Sphere(FILLET5_R, mode=Mode.PRIVATE)
    add(fillet5_piece_2, mode=Mode.SUBTRACT)
    with BuildSketch(Plane(origin=(-65, 65, -90), x_dir=(0, 1, 0), z_dir=(-1, 0, 0))) as fillet5_piece_3_section:
        Polygon((0, 0), (FILLET5_R, 0), (FILLET5_R, FILLET5_R), (0, FILLET5_R), align=None)
    fillet5_piece_3 = extrude(amount=FILLET5_R, mode=Mode.PRIVATE)
    fillet5_piece_3 = fillet5_piece_3 - Plane(origin=(-65, 65, -90), x_dir=(0, -0.7071067811865475, 0.7071067811865475), z_dir=(-1, 0, 0)) * Sphere(FILLET5_R, mode=Mode.PRIVATE)
    add(fillet5_piece_3, mode=Mode.SUBTRACT)
    with BuildSketch(Plane(origin=(-65, 65, -10), x_dir=(0, 1, 0), z_dir=(-1, 0, 0))) as fillet5_piece_4_section:
        Polygon((0, 0), (FILLET5_R, 0), (FILLET5_R, -FILLET5_R), (0, -FILLET5_R), align=None)
    fillet5_piece_4 = extrude(amount=FILLET5_R, mode=Mode.PRIVATE)
    fillet5_piece_4 = fillet5_piece_4 - Plane(origin=(-65, 65, -10), x_dir=(0, -0.7071067811865475, -0.7071067811865475), z_dir=(-1, 0, 0)) * Sphere(FILLET5_R, mode=Mode.PRIVATE)
    add(fillet5_piece_4, mode=Mode.SUBTRACT)
    with BuildSketch(Plane(origin=(75, 75, -10), x_dir=(0, -1, 0), z_dir=(0, 0, -1))) as fillet5_piece_5:
        with BuildLine():
            CenterArc((FILLET5_R, FILLET5_R), FILLET5_R, 180, 90)
            Line((0, FILLET5_R), (0, 0))
            Line((0, 0), (FILLET5_R, 0))
        make_face()
    extrude(amount=80, mode=Mode.SUBTRACT)
    with BuildSketch(Plane(origin=(-75, 75, -10), x_dir=(0, -1, 0), z_dir=(0, 0, -1))) as fillet5_piece_6:
        with BuildLine():
            CenterArc((FILLET5_R, -FILLET5_R), FILLET5_R, 90, 90)
            Line((0, -FILLET5_R), (0, 0))
            Line((0, 0), (FILLET5_R, 0))
        make_face()
    extrude(amount=80, mode=Mode.SUBTRACT)

    # Sketch14 → Cut-Extrude9 (cut, through all)
    with BuildSketch(Plane(origin=(24.8, 0, 0), x_dir=(0, 0, -1), z_dir=(1, 0, 0))):
        with Locations(Location((50, 126, 0), (0, 0, 25.856016698))):
            Circle(SKETCH14_R)
    extrude(amount=-CUT_EXTRUDE9_DEPTH, mode=Mode.SUBTRACT)


with BuildPart() as body_2:
    # Sketch13 → Boss-Extrude7 (new body)
    with BuildSketch(Plane(origin=(0, 0, -100), x_dir=(-1, 0, 0), z_dir=(0, 0, -1))):
        Polygon((-25, -25), (-25, -55), (25.018802851, -55), (25, -25), align=None)
    extrude(amount=BOSS_EXTRUDE7_DEPTH)

    # Fillet4
    # the kernel refuses this fillet: 10 mm, written as the material it takes off along each edge
    with BuildSketch(Plane(origin=(-25.021013242, -58.526683302, -100.1), x_dir=(0, 0, 1), z_dir=(0.0006267615930632001, 0.9999998035849335, 0))) as fillet4_piece_1:
        with BuildLine():
            CenterArc((10, 1.410673598), FILLET4_R, 180, 8.109614456)
            Line((0, 1.410673598), (0, 0))
            Line((0, 0), (0.1, 0))
        make_face()
    extrude(amount=37.053373882, mode=Mode.SUBTRACT)
    with BuildSketch(Plane(origin=(25, -21.473316005, -100.1), x_dir=(0, 0, 1), z_dir=(0, -1, 0))) as fillet4_piece_2:
        with BuildLine():
            CenterArc((10, 1.410673598), FILLET4_R, 180, 8.109614456)
            Line((0, 1.410673598), (0, 0))
            Line((0, 0), (0.1, 0))
        make_face()
    extrude(amount=37.05336799, mode=Mode.SUBTRACT)
    with BuildSketch(Plane(origin=(28.526683995, -55, -100.1), x_dir=(0, 0, 1), z_dir=(-1, 0, 0))) as fillet4_piece_3:
        with BuildLine():
            CenterArc((10, 1.410673598), FILLET4_R, 180, 8.109614456)
            Line((0, 1.410673598), (0, 0))
            Line((0, 0), (0.1, 0))
        make_face()
    extrude(amount=57.072170841, mode=Mode.SUBTRACT)


solid = Compound([part.part, body_2.part])
